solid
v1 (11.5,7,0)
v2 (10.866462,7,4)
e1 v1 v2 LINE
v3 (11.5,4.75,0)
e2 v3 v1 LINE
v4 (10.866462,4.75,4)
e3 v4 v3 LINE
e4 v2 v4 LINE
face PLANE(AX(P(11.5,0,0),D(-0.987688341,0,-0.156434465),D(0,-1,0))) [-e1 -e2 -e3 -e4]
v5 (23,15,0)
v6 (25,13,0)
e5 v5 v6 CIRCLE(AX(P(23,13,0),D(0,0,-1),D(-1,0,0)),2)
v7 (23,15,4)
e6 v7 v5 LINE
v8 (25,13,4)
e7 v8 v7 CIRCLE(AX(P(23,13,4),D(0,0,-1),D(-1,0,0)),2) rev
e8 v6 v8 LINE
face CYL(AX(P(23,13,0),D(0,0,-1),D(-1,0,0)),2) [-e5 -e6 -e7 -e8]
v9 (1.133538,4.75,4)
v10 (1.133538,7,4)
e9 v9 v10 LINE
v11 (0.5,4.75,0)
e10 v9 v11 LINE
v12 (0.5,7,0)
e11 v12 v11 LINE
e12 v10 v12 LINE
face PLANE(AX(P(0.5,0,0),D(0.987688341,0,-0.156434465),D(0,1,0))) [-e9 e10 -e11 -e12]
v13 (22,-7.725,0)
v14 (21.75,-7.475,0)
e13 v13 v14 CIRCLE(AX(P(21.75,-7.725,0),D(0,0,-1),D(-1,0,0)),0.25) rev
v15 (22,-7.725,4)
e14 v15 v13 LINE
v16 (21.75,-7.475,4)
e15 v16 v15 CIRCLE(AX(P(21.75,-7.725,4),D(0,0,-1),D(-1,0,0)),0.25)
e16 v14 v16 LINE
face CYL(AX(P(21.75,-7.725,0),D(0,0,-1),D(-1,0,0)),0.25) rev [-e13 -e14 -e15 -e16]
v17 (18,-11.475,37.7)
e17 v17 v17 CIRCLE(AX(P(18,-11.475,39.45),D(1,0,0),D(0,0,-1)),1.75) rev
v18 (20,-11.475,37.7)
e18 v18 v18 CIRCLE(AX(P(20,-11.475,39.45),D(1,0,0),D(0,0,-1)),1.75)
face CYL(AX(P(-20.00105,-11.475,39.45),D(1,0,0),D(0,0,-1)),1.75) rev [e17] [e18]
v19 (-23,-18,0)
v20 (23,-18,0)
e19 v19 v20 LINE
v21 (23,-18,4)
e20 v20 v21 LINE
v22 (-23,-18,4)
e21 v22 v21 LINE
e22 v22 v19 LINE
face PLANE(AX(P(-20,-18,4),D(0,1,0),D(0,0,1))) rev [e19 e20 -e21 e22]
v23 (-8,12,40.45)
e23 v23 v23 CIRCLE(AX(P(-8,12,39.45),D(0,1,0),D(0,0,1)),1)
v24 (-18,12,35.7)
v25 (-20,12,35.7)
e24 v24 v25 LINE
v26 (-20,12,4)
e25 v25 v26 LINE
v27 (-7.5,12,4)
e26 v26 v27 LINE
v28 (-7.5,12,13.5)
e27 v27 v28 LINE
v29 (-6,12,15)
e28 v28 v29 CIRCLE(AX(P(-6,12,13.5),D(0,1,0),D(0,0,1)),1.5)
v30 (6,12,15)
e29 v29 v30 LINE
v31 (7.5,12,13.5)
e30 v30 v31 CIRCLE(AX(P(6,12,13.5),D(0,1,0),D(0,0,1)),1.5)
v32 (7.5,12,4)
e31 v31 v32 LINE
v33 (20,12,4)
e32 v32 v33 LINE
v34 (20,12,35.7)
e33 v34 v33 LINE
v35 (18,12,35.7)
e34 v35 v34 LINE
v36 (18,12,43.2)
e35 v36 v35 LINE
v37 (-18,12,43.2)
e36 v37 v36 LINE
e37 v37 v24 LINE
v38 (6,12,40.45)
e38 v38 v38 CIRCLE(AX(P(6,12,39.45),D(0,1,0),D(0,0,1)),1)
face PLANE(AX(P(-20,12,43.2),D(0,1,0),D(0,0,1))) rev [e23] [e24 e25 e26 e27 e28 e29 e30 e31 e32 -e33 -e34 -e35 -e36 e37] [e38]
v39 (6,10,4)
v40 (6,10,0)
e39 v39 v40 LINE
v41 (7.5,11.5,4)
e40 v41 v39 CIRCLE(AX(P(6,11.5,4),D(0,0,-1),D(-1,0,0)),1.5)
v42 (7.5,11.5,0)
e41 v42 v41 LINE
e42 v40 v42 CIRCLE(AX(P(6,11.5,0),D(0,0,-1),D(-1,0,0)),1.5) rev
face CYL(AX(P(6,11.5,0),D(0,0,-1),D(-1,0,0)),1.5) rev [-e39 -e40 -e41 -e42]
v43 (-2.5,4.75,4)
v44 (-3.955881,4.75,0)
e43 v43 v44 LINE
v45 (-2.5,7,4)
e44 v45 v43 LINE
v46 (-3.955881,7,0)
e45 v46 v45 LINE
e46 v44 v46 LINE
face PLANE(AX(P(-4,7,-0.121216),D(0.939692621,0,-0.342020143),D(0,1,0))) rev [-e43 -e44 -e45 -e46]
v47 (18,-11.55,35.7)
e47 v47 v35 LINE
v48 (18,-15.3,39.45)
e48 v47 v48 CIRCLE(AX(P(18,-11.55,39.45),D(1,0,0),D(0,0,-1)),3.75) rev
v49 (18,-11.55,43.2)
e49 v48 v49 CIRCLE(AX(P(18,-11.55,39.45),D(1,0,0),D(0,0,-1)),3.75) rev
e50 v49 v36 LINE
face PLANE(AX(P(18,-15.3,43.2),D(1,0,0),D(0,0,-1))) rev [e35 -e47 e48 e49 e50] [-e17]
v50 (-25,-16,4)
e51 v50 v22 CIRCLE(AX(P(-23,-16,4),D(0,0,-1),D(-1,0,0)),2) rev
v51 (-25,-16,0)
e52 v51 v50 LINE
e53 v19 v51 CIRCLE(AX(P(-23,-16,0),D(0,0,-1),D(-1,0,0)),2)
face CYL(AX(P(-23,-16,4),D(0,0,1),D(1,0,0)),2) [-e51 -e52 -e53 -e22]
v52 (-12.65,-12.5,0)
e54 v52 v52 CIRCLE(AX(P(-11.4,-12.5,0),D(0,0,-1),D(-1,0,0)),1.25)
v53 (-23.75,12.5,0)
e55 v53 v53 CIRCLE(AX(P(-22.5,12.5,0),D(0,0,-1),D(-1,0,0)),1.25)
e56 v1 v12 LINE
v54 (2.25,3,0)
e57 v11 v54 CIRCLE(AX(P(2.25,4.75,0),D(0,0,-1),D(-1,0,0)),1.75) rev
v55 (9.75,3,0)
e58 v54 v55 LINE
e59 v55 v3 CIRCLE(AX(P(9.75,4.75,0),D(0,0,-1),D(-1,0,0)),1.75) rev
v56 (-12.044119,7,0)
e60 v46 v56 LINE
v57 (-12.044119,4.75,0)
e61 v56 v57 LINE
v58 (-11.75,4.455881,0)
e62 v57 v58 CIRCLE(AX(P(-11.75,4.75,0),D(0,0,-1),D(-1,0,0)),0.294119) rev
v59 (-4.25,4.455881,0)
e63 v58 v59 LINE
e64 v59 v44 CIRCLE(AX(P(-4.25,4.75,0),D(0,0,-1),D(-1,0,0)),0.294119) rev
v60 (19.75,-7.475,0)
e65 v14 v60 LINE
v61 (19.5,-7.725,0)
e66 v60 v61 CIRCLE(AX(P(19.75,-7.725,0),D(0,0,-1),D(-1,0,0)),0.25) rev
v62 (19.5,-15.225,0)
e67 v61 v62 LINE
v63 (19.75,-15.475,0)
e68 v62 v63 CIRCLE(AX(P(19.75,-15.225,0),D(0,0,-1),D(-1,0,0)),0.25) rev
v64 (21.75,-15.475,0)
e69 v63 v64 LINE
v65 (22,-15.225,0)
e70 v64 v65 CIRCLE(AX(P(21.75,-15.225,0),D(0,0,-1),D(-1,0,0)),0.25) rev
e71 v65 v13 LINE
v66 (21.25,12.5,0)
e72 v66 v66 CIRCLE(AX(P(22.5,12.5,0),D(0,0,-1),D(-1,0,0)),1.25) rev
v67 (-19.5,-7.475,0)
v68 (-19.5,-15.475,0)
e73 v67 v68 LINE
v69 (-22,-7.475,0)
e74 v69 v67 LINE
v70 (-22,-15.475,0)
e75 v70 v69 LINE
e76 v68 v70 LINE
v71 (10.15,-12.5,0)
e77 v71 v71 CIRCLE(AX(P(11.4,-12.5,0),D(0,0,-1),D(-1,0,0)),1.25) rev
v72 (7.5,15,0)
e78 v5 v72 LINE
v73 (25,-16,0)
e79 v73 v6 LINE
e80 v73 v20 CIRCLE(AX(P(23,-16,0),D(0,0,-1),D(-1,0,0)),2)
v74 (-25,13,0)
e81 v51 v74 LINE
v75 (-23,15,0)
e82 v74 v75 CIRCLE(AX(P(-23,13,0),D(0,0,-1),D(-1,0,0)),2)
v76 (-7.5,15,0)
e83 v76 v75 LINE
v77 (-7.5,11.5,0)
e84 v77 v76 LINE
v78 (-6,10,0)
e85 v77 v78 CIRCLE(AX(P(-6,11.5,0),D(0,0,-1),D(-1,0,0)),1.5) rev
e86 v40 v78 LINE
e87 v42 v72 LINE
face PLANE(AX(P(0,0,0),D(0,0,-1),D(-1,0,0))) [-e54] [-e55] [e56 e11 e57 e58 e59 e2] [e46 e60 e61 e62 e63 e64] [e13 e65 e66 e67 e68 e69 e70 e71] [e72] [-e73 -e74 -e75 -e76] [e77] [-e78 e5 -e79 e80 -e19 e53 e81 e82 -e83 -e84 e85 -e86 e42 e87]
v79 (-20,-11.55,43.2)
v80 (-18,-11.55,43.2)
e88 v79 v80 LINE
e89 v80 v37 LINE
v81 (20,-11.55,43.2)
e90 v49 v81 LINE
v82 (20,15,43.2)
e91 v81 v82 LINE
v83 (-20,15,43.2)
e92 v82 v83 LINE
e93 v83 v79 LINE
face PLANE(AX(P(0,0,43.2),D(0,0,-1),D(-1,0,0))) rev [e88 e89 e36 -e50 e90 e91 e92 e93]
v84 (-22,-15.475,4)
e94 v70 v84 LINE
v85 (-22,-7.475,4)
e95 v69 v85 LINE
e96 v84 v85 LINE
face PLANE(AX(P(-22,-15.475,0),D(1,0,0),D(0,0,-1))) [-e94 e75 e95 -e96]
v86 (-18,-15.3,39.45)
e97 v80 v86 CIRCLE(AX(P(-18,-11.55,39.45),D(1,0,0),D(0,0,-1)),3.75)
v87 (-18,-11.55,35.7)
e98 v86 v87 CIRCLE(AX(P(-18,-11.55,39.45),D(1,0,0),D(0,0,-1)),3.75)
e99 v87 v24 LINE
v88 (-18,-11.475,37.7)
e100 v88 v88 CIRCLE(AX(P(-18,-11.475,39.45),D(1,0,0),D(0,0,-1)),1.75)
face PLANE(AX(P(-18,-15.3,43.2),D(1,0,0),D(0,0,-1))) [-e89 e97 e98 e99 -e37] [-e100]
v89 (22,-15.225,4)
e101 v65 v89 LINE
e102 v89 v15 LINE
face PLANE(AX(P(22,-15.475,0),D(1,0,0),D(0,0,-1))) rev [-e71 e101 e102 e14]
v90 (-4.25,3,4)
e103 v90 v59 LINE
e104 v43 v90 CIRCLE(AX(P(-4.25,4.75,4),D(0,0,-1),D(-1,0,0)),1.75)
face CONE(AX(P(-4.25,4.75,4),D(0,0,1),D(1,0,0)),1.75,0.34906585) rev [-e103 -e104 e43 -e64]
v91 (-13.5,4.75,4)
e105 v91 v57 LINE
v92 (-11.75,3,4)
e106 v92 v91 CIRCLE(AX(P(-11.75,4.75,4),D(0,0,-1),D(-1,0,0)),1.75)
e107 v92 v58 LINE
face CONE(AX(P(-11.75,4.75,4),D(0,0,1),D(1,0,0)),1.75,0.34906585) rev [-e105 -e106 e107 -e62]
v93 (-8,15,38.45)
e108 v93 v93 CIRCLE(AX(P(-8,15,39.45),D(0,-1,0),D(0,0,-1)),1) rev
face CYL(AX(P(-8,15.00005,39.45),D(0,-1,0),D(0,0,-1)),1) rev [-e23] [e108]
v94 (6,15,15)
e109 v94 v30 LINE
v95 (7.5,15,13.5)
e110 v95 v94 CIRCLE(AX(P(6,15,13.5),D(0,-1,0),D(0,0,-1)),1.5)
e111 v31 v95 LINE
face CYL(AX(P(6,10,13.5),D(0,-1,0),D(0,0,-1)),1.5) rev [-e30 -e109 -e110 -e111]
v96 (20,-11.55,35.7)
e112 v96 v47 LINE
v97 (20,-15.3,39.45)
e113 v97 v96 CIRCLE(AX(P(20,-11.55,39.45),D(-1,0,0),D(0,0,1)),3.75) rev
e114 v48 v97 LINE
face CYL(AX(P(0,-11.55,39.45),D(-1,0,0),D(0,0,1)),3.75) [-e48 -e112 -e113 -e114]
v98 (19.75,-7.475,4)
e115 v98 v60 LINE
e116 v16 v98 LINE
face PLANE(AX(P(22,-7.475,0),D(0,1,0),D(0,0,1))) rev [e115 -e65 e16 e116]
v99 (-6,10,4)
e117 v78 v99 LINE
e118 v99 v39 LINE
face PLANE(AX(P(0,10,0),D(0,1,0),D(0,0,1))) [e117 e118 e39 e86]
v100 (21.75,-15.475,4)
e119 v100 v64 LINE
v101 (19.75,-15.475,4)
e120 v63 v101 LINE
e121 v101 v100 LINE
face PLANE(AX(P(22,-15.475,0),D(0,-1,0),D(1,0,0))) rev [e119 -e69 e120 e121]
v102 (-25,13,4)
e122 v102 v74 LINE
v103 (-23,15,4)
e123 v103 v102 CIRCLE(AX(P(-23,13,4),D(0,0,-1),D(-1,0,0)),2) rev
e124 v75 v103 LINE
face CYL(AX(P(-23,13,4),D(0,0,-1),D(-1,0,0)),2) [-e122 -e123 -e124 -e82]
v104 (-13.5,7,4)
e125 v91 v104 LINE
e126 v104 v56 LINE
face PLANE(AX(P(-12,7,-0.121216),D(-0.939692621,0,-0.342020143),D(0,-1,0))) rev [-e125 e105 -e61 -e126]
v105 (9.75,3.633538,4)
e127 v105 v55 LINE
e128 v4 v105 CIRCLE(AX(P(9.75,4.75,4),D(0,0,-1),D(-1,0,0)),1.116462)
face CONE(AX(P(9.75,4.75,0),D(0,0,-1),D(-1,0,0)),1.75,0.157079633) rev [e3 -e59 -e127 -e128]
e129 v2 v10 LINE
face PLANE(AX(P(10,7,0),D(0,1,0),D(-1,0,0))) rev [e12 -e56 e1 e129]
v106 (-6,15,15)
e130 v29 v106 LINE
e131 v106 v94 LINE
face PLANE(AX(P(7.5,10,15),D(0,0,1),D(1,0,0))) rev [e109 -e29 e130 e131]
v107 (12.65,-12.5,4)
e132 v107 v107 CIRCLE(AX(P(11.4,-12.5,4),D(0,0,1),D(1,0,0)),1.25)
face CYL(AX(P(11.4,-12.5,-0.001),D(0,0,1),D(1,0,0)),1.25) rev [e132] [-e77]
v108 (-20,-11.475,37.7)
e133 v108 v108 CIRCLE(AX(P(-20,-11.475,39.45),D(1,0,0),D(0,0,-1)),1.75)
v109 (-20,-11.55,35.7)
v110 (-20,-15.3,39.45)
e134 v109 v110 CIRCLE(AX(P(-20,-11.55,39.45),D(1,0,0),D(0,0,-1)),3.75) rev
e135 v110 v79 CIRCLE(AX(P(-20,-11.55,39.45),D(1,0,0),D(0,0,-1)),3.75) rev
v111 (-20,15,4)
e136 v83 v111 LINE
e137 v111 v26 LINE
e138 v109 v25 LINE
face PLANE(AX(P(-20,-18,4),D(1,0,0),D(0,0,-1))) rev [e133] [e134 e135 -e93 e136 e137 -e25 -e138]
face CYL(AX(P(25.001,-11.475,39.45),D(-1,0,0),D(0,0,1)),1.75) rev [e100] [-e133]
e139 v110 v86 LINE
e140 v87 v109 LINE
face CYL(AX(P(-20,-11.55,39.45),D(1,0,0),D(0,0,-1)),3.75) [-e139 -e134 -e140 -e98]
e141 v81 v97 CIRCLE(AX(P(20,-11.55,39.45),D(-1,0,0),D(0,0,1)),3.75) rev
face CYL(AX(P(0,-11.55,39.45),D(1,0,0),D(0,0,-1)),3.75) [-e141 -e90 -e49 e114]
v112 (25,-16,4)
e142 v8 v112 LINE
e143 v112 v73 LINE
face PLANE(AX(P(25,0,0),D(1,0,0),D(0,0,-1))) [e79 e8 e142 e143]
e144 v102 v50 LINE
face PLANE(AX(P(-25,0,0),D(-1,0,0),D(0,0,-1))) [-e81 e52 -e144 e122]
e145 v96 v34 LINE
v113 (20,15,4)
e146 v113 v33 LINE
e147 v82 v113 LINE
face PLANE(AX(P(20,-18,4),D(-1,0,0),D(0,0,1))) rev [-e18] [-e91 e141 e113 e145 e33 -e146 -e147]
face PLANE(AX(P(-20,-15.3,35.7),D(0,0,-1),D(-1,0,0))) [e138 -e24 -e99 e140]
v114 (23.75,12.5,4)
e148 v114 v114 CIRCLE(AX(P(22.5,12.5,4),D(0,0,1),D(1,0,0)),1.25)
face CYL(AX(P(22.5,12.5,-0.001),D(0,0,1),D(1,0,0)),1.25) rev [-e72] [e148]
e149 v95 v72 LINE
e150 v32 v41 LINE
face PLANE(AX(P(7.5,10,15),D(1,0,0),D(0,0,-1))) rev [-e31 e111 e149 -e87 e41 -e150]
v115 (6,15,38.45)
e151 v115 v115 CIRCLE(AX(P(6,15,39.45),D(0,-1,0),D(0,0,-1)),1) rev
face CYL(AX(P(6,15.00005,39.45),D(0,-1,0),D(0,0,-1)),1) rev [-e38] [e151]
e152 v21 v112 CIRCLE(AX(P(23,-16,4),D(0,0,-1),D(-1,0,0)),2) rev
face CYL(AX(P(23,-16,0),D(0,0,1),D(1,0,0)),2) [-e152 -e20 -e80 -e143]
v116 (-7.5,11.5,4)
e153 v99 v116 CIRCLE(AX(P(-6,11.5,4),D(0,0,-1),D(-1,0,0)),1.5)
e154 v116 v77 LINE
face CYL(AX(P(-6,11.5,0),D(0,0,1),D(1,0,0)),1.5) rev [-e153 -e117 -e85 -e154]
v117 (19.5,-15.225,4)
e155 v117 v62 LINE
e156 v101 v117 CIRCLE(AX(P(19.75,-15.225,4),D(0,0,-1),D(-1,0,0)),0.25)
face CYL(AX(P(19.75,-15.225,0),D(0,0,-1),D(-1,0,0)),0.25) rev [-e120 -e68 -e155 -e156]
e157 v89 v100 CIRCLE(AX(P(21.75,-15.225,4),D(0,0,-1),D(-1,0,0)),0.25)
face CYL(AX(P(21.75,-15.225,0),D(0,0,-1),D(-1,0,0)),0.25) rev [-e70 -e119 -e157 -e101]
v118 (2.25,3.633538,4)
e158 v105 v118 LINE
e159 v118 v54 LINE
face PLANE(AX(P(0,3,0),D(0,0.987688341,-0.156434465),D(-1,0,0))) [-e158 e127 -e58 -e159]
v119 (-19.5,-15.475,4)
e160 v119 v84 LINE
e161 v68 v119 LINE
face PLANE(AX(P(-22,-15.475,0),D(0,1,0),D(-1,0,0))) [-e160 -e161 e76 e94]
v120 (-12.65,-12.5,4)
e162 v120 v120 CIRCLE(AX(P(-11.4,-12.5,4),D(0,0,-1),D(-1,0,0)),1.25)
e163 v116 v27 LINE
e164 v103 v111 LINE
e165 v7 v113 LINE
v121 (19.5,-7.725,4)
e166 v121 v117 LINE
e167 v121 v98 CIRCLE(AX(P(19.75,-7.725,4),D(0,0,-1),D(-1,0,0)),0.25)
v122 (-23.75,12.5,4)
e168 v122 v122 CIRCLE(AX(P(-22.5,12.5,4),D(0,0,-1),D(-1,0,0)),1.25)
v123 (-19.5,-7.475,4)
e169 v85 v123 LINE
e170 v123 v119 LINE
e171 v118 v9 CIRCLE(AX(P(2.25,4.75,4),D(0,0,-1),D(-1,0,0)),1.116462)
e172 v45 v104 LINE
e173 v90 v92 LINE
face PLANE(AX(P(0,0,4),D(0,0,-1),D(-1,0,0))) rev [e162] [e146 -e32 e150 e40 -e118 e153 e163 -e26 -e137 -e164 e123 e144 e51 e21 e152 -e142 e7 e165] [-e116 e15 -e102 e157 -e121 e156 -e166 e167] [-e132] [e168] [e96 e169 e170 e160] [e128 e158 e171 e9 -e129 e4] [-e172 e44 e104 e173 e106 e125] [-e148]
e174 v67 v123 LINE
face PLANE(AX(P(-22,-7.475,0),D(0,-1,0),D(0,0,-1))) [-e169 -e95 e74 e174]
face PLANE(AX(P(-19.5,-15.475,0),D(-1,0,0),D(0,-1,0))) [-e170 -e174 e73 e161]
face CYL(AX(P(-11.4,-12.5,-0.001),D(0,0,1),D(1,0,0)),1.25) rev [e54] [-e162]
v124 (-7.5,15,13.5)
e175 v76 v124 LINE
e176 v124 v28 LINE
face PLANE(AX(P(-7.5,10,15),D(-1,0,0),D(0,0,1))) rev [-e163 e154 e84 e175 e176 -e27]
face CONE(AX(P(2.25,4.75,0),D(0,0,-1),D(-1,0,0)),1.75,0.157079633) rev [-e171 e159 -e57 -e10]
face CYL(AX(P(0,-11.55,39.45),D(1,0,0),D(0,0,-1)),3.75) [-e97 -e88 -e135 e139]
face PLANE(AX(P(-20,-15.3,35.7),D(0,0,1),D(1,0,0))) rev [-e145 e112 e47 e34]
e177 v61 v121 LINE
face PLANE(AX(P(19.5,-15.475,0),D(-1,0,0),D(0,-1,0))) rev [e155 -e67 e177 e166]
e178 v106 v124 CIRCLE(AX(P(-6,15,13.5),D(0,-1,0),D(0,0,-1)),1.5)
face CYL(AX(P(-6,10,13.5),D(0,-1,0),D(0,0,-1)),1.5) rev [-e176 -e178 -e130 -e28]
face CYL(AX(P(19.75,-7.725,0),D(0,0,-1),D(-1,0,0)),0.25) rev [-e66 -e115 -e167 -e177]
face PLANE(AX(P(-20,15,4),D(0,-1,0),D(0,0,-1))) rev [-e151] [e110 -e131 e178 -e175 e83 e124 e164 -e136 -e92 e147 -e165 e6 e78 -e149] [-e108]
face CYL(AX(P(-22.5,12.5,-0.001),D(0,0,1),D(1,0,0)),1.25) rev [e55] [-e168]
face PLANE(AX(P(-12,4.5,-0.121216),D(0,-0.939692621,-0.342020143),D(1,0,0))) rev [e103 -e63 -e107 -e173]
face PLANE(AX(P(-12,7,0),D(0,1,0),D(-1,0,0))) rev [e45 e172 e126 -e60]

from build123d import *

# Parameters (mm, degrees)
SKETCH1_W             = 40
SKETCH1_H             = 33
BOSS_EXTRUDE1_DEPTH   = 4
SKETCH3_W             = 40
SKETCH3_H             = 3
BOSS_EXTRUDE2_DEPTH   = 39.2
SKETCH10_W            = 2
SKETCH10_H            = 7.5
BOSS_EXTRUDE3_DEPTH   = 27.3
SKETCH12_W            = 4
SKETCH12_H            = 33
BOSS_EXTRUDE4_DEPTH   = 5
SKETCH13_W            = 2.5
SKETCH13_H            = 8
CUT_EXTRUDE5_DEPTH    = 50.856193196
CUT_EXTRUDE6_REACH    = 63.565
SKETCH15_R            = 1.75
FILLET6_R             = 3.75
CUT_EXTRUDE8_REACH    = 51.856
SKETCH23_R            = 1.25
FILLET8_R             = 2
SKETCH25_R            = 1
CUT_EXTRUDE10_DEPTH   = 59.234354122
SKETCH26_W            = 8
SKETCH26_H            = 2.5
CUT_EXTRUDE11_DEPTH   = 50.856193196
FILLET3_R             = 0.25
FILLET6_OF_MIRROR10_R = 3.75
FILLET8_OF_MIRROR10_R = 2
SKETCH28_W            = 8
SKETCH28_H            = 2.5
CUT_EXTRUDE12_DEPTH   = 50.856193196
FILLET9_R             = 0.25
CHAMFER1_SIZE         = 1.5
CHAMFER1_SIZE_2       = 4.121216129
CHAMFER2_SIZE         = 9.470627272
CHAMFER2_SIZE_2       = 1.5
SKETCH29_W            = 15
SKETCH29_H            = 15
CUT_EXTRUDE13_DEPTH   = 5
FILLET10_R            = 1.5


# Some blends are built 0.0001 mm under size
with BuildPart() as part:
    # Sketch1 → Boss-Extrude1 (new body)
    with BuildSketch(Plane.XY):
        with Locations((0, -1.5)):
            Rectangle(SKETCH1_W, SKETCH1_H)
    extrude(amount=BOSS_EXTRUDE1_DEPTH)

    # Sketch3 → Boss-Extrude2 (add)
    with BuildSketch(Plane.XY.offset(4)):
        with Locations((0, 13.5)):
            Rectangle(SKETCH3_W, SKETCH3_H)
    extrude(amount=BOSS_EXTRUDE2_DEPTH)

    # Sketch10 → Boss-Extrude3 (add)
    with BuildSketch(Plane.XZ.offset(-12)):
        with Locations((19, 39.45)):
            Rectangle(SKETCH10_W, SKETCH10_H)
    boss_extrude3 = extrude(amount=BOSS_EXTRUDE3_DEPTH)

    # Sketch12 → Boss-Extrude4 (add)
    with BuildSketch(Plane(origin=(20, 0, 0), x_dir=(0, 0, -1), z_dir=(1, 0, 0))):
        with Locations((-2, -1.5)):
            Rectangle(SKETCH12_W, SKETCH12_H)
    boss_extrude4 = extrude(amount=BOSS_EXTRUDE4_DEPTH)

    # Sketch13 → Cut-Extrude5 (cut, through all)
    with BuildSketch(Plane.XY.offset(4)):
        with Locations((20.75, -11.475)):
            Rectangle(SKETCH13_W, SKETCH13_H)
    cut_extrude5 = extrude(amount=-CUT_EXTRUDE5_DEPTH, mode=Mode.SUBTRACT)

    # Sketch15 → Cut-Extrude6 (cut, up to next)
    with BuildSketch(Plane(origin=(20, 0, 0), x_dir=(0, 0, -1), z_dir=(1, 0, 0)), mode=Mode.PRIVATE) as cut_extrude6_sk1:
        with Locations((-39.45, -11.475)):
            Circle(SKETCH15_R)
    cut_extrude6_tool1 = extrude(cut_extrude6_sk1.sketch, amount=-CUT_EXTRUDE6_REACH, mode=Mode.PRIVATE) & part.part
    cut_extrude6 = cut_extrude6_tool1.solids().sort_by_distance((20, -11.475, 39.45))[0]
    add(cut_extrude6, mode=Mode.SUBTRACT)

    # Fillet6
    fillet6_edges = [part.edges().sort_by_distance(p)[0] for p in [
        (19, -15.3, 35.7),
        (19, -15.3, 43.2),
    ]]
    fillet(fillet6_edges, radius=FILLET6_R - 0.0001)  # a hair under: the kernel refuses the full size

    # Sketch23 → Cut-Extrude8 (cut, up to next)
    with BuildSketch(Plane.XY.offset(4), mode=Mode.PRIVATE) as cut_extrude8_sk1:
        with Locations((11.4, -12.5)):
            Circle(SKETCH23_R)
    cut_extrude8_tool1 = extrude(cut_extrude8_sk1.sketch, amount=-CUT_EXTRUDE8_REACH, mode=Mode.PRIVATE) & part.part
    # Sketch23 → Cut-Extrude8 (cut, up to next)
    with BuildSketch(Plane.XY.offset(4), mode=Mode.PRIVATE) as cut_extrude8_sk2:
        with Locations((22.5, 12.5)):
            Circle(SKETCH23_R)
    cut_extrude8_tool2 = extrude(cut_extrude8_sk2.sketch, amount=-CUT_EXTRUDE8_REACH, mode=Mode.PRIVATE) & part.part
    cut_extrude8_1 = cut_extrude8_tool1.solids().sort_by_distance((11.4, -12.5, 4))[0]
    add(cut_extrude8_1, mode=Mode.SUBTRACT)
    cut_extrude8_2 = cut_extrude8_tool2.solids().sort_by_distance((22.5, 12.5, 4))[0]
    add(cut_extrude8_2, mode=Mode.SUBTRACT)
    cut_extrude8 = cut_extrude8_1 + cut_extrude8_2  # Cut-Extrude8 as one shape, for the pattern or mirror that repeats it

    # Fillet8
    fillet8_edges = [part.edges().sort_by_distance(p)[0] for p in [
        (25, 15, 2),
        (25, -18, 2),
    ]]
    fillet(fillet8_edges, radius=FILLET8_R)

    # Sketch25 → Cut-Extrude10 (cut, through all)
    with BuildSketch(Plane.XZ.offset(-12)):
        with Locations(Location((6, 39.45, 0), (0, 0, 270))):
            Circle(SKETCH25_R)
        with Locations(Location((-8, 39.45, 0), (0, 0, 270))):
            Circle(SKETCH25_R)
    extrude(amount=-CUT_EXTRUDE10_DEPTH, mode=Mode.SUBTRACT)

    # Sketch26 → Cut-Extrude11 (cut, through all)
    with BuildSketch(Plane.XY.offset(4)):
        with Locations((6, 5.75)):
            Rectangle(SKETCH26_W, SKETCH26_H)
    extrude(amount=-CUT_EXTRUDE11_DEPTH, mode=Mode.SUBTRACT)

    # Fillet3
    fillet3_edges = [part.edges().sort_by_distance(p)[0] for p in [
        (22, -7.475, 2),
        (22, -15.475, 2),
        (19.5, -15.475, 2),
        (19.5, -7.475, 2),
    ]]
    fillet(fillet3_edges, radius=FILLET3_R)

    # Mirror10: Boss-Extrude3, Boss-Extrude4, Cut-Extrude5, Cut-Extrude6, Cut-Extrude8 across plane
    add(boss_extrude3.mirror(Plane(origin=(0, 0, 0), x_dir=(0, 0, 1), z_dir=(1, 0, 0))))
    add(boss_extrude4.mirror(Plane(origin=(0, 0, 0), x_dir=(0, 0, 1), z_dir=(1, 0, 0))))
    add(cut_extrude5.mirror(Plane(origin=(0, 0, 0), x_dir=(0, 0, 1), z_dir=(1, 0, 0))), mode=Mode.SUBTRACT)
    add(cut_extrude6.mirror(Plane(origin=(0, 0, 0), x_dir=(0, 0, 1), z_dir=(1, 0, 0))), mode=Mode.SUBTRACT)
    add(cut_extrude8.mirror(Plane(origin=(0, 0, 0), x_dir=(0, 0, 1), z_dir=(1, 0, 0))), mode=Mode.SUBTRACT)

    # Fillet6 of Mirror10
    fillet6_of_mirror10_edges = [part.edges().sort_by_distance(p)[0] for p in [
        (-19, -15.3, 35.7),
        (-19, -15.3, 43.2),
    ]]
    fillet(fillet6_of_mirror10_edges, radius=FILLET6_OF_MIRROR10_R - 0.0001)  # a hair under: the kernel refuses the full size

    # Fillet8 of Mirror10
    fillet8_of_mirror10_edges = [part.edges().sort_by_distance(p)[0] for p in [
        (-25, 15, 2),
        (-25, -18, 2),
    ]]
    fillet(fillet8_of_mirror10_edges, radius=FILLET8_OF_MIRROR10_R)

    # Sketch28 → Cut-Extrude12 (cut, through all)
    with BuildSketch(Plane.XY.offset(4)):
        with Locations((-8, 5.75)):
            Rectangle(SKETCH28_W, SKETCH28_H)
    extrude(amount=-CUT_EXTRUDE12_DEPTH, mode=Mode.SUBTRACT)

    # Fillet9
    fillet9_edges = [part.edges().sort_by_distance(p)[0] for p in [
        (10, 4.5, 2),
        (2, 4.5, 2),
        (-12, 4.5, 2),
        (-4, 4.5, 2),
    ]]
    fillet(fillet9_edges, radius=FILLET9_R)

    # Chamfer1
    # the kernel refuses this chamfer: 4.121216129, 1.5 mm, written as the material it takes off along each edge
    with BuildSketch(Plane(origin=(-12, 4.75, 4), x_dir=(-0.9950833631817486, 0, 0.09904090225205062), z_dir=(0, 1, 0)), Plane(origin=(-4, 7, 4), x_dir=(0.9950833631817486, 0, 0.09904090225205064), z_dir=(0, -1, 0))) as chamfer1_piece_1:
        Polygon((CHAMFER1_SIZE * 0.995083363182, -CHAMFER1_SIZE * 0.0990409022521), (-CHAMFER1_SIZE_2 * 0.0990409022564, -CHAMFER1_SIZE_2 * 0.995083363226), (0, 0), align=None)
    extrude(amount=2.25, mode=Mode.SUBTRACT)
    with BuildSketch(Plane(origin=(-11.75, 4.75, 4), x_dir=(-1, 0, 0), z_dir=(0, 1, 0))) as chamfer1_piece_2:
        Polygon((0.25 + CHAMFER1_SIZE, 0), (0.25, -CHAMFER1_SIZE_2), (0.25, 0), align=None)
    revolve(axis=Axis((-11.75, 4.75, 4), (0, 0, 1)), revolution_arc=90, mode=Mode.SUBTRACT)
    with BuildSketch(Plane(origin=(-4.25, 4.75, 4), x_dir=(0, -1, 0), z_dir=(-1, 0, 0))) as chamfer1_piece_3:
        Polygon((0.25 + CHAMFER1_SIZE, 0), (0.25, -CHAMFER1_SIZE_2), (0.25, 0), align=None)
    revolve(axis=Axis((-4.25, 4.75, 4), (0, 0, 1)), revolution_arc=90, mode=Mode.SUBTRACT)
    with BuildSketch(Plane(origin=(-4.25, 4.5, 4), x_dir=(0, -0.9950833631817486, 0.09904090225205064), z_dir=(-1, 0, 0))) as chamfer1_piece_4:
        Polygon((CHAMFER1_SIZE * 0.995083363182, -CHAMFER1_SIZE * 0.0990409022521), (-CHAMFER1_SIZE_2 * 0.0990409022564, -CHAMFER1_SIZE_2 * 0.995083363226), (0, 0), align=None)
    extrude(amount=7.5, mode=Mode.SUBTRACT)

    # Chamfer2
    # the kernel refuses this chamfer: 9.470627272, 1.5 mm, written as the material it takes off along each edge
    with BuildSketch(Plane(origin=(2, 7, 0), x_dir=(0.006019451551713046, 0, 0.9999818829373942), z_dir=(0, -1, 0)), Plane(origin=(10, 4.75, 0), x_dir=(-0.006019451551713001, 0, 0.9999818829373942), z_dir=(0, 1, 0))) as chamfer2_piece_1:
        Polygon((CHAMFER2_SIZE * 0.999981882939, CHAMFER2_SIZE * 0.00601945155172), (-CHAMFER2_SIZE_2 * 0.00601945155171, CHAMFER2_SIZE_2 * 0.999981882937), (0, 0), align=None)
    extrude(amount=2.25, mode=Mode.SUBTRACT)
    with BuildSketch(Plane(origin=(2.25, 4.75, 0), x_dir=(-1, 0, 0), z_dir=(0, 1, 0))) as chamfer2_piece_2:
        Polygon((0.25, CHAMFER2_SIZE), (0.25 + CHAMFER2_SIZE_2, 0), (0.25, 0), align=None)
    revolve(axis=Axis((2.25, 4.75, 0), (0, 0, 1)), revolution_arc=90, mode=Mode.SUBTRACT)
    with BuildSketch(Plane(origin=(9.75, 4.75, 0), x_dir=(1, 0, 0), z_dir=(0, 1, 0))) as chamfer2_piece_3:
        Polygon((0.25, -CHAMFER2_SIZE), (0.25 + CHAMFER2_SIZE_2, 0), (0.25, 0), align=None)
    revolve(axis=Axis((9.75, 4.75, 0), (0, 0, -1)), revolution_arc=90, mode=Mode.SUBTRACT)
    with BuildSketch(Plane(origin=(2.25, 4.5, 0), x_dir=(0, 0.006019451551713091, 0.9999818829373942), z_dir=(1, 0, 0))) as chamfer2_piece_4:
        Polygon((CHAMFER2_SIZE * 0.999981882939, CHAMFER2_SIZE * 0.00601945155172), (-CHAMFER2_SIZE_2 * 0.00601945155171, CHAMFER2_SIZE_2 * 0.999981882937), (0, 0), align=None)
    extrude(amount=7.5, mode=Mode.SUBTRACT)

    # Sketch29 → Cut-Extrude13 (cut)
    with BuildSketch(Plane(origin=(0, 15, 0), x_dir=(1, 0, 0), z_dir=(0, 1, 0))):
        with Locations((0, -7.5)):
            Rectangle(SKETCH29_W, SKETCH29_H)
    extrude(amount=-CUT_EXTRUDE13_DEPTH, mode=Mode.SUBTRACT)

    # Fillet10
    fillet10_edges = [part.edges().sort_by_distance(p)[0] for p in [
        (-7.5, 10, 2),
        (-7.5, 13.5, 15),
        (7.5, 10, 2),
        (7.5, 13.5, 15),
    ]]
    fillet(fillet10_edges, radius=FILLET10_R)


solid = part.part
